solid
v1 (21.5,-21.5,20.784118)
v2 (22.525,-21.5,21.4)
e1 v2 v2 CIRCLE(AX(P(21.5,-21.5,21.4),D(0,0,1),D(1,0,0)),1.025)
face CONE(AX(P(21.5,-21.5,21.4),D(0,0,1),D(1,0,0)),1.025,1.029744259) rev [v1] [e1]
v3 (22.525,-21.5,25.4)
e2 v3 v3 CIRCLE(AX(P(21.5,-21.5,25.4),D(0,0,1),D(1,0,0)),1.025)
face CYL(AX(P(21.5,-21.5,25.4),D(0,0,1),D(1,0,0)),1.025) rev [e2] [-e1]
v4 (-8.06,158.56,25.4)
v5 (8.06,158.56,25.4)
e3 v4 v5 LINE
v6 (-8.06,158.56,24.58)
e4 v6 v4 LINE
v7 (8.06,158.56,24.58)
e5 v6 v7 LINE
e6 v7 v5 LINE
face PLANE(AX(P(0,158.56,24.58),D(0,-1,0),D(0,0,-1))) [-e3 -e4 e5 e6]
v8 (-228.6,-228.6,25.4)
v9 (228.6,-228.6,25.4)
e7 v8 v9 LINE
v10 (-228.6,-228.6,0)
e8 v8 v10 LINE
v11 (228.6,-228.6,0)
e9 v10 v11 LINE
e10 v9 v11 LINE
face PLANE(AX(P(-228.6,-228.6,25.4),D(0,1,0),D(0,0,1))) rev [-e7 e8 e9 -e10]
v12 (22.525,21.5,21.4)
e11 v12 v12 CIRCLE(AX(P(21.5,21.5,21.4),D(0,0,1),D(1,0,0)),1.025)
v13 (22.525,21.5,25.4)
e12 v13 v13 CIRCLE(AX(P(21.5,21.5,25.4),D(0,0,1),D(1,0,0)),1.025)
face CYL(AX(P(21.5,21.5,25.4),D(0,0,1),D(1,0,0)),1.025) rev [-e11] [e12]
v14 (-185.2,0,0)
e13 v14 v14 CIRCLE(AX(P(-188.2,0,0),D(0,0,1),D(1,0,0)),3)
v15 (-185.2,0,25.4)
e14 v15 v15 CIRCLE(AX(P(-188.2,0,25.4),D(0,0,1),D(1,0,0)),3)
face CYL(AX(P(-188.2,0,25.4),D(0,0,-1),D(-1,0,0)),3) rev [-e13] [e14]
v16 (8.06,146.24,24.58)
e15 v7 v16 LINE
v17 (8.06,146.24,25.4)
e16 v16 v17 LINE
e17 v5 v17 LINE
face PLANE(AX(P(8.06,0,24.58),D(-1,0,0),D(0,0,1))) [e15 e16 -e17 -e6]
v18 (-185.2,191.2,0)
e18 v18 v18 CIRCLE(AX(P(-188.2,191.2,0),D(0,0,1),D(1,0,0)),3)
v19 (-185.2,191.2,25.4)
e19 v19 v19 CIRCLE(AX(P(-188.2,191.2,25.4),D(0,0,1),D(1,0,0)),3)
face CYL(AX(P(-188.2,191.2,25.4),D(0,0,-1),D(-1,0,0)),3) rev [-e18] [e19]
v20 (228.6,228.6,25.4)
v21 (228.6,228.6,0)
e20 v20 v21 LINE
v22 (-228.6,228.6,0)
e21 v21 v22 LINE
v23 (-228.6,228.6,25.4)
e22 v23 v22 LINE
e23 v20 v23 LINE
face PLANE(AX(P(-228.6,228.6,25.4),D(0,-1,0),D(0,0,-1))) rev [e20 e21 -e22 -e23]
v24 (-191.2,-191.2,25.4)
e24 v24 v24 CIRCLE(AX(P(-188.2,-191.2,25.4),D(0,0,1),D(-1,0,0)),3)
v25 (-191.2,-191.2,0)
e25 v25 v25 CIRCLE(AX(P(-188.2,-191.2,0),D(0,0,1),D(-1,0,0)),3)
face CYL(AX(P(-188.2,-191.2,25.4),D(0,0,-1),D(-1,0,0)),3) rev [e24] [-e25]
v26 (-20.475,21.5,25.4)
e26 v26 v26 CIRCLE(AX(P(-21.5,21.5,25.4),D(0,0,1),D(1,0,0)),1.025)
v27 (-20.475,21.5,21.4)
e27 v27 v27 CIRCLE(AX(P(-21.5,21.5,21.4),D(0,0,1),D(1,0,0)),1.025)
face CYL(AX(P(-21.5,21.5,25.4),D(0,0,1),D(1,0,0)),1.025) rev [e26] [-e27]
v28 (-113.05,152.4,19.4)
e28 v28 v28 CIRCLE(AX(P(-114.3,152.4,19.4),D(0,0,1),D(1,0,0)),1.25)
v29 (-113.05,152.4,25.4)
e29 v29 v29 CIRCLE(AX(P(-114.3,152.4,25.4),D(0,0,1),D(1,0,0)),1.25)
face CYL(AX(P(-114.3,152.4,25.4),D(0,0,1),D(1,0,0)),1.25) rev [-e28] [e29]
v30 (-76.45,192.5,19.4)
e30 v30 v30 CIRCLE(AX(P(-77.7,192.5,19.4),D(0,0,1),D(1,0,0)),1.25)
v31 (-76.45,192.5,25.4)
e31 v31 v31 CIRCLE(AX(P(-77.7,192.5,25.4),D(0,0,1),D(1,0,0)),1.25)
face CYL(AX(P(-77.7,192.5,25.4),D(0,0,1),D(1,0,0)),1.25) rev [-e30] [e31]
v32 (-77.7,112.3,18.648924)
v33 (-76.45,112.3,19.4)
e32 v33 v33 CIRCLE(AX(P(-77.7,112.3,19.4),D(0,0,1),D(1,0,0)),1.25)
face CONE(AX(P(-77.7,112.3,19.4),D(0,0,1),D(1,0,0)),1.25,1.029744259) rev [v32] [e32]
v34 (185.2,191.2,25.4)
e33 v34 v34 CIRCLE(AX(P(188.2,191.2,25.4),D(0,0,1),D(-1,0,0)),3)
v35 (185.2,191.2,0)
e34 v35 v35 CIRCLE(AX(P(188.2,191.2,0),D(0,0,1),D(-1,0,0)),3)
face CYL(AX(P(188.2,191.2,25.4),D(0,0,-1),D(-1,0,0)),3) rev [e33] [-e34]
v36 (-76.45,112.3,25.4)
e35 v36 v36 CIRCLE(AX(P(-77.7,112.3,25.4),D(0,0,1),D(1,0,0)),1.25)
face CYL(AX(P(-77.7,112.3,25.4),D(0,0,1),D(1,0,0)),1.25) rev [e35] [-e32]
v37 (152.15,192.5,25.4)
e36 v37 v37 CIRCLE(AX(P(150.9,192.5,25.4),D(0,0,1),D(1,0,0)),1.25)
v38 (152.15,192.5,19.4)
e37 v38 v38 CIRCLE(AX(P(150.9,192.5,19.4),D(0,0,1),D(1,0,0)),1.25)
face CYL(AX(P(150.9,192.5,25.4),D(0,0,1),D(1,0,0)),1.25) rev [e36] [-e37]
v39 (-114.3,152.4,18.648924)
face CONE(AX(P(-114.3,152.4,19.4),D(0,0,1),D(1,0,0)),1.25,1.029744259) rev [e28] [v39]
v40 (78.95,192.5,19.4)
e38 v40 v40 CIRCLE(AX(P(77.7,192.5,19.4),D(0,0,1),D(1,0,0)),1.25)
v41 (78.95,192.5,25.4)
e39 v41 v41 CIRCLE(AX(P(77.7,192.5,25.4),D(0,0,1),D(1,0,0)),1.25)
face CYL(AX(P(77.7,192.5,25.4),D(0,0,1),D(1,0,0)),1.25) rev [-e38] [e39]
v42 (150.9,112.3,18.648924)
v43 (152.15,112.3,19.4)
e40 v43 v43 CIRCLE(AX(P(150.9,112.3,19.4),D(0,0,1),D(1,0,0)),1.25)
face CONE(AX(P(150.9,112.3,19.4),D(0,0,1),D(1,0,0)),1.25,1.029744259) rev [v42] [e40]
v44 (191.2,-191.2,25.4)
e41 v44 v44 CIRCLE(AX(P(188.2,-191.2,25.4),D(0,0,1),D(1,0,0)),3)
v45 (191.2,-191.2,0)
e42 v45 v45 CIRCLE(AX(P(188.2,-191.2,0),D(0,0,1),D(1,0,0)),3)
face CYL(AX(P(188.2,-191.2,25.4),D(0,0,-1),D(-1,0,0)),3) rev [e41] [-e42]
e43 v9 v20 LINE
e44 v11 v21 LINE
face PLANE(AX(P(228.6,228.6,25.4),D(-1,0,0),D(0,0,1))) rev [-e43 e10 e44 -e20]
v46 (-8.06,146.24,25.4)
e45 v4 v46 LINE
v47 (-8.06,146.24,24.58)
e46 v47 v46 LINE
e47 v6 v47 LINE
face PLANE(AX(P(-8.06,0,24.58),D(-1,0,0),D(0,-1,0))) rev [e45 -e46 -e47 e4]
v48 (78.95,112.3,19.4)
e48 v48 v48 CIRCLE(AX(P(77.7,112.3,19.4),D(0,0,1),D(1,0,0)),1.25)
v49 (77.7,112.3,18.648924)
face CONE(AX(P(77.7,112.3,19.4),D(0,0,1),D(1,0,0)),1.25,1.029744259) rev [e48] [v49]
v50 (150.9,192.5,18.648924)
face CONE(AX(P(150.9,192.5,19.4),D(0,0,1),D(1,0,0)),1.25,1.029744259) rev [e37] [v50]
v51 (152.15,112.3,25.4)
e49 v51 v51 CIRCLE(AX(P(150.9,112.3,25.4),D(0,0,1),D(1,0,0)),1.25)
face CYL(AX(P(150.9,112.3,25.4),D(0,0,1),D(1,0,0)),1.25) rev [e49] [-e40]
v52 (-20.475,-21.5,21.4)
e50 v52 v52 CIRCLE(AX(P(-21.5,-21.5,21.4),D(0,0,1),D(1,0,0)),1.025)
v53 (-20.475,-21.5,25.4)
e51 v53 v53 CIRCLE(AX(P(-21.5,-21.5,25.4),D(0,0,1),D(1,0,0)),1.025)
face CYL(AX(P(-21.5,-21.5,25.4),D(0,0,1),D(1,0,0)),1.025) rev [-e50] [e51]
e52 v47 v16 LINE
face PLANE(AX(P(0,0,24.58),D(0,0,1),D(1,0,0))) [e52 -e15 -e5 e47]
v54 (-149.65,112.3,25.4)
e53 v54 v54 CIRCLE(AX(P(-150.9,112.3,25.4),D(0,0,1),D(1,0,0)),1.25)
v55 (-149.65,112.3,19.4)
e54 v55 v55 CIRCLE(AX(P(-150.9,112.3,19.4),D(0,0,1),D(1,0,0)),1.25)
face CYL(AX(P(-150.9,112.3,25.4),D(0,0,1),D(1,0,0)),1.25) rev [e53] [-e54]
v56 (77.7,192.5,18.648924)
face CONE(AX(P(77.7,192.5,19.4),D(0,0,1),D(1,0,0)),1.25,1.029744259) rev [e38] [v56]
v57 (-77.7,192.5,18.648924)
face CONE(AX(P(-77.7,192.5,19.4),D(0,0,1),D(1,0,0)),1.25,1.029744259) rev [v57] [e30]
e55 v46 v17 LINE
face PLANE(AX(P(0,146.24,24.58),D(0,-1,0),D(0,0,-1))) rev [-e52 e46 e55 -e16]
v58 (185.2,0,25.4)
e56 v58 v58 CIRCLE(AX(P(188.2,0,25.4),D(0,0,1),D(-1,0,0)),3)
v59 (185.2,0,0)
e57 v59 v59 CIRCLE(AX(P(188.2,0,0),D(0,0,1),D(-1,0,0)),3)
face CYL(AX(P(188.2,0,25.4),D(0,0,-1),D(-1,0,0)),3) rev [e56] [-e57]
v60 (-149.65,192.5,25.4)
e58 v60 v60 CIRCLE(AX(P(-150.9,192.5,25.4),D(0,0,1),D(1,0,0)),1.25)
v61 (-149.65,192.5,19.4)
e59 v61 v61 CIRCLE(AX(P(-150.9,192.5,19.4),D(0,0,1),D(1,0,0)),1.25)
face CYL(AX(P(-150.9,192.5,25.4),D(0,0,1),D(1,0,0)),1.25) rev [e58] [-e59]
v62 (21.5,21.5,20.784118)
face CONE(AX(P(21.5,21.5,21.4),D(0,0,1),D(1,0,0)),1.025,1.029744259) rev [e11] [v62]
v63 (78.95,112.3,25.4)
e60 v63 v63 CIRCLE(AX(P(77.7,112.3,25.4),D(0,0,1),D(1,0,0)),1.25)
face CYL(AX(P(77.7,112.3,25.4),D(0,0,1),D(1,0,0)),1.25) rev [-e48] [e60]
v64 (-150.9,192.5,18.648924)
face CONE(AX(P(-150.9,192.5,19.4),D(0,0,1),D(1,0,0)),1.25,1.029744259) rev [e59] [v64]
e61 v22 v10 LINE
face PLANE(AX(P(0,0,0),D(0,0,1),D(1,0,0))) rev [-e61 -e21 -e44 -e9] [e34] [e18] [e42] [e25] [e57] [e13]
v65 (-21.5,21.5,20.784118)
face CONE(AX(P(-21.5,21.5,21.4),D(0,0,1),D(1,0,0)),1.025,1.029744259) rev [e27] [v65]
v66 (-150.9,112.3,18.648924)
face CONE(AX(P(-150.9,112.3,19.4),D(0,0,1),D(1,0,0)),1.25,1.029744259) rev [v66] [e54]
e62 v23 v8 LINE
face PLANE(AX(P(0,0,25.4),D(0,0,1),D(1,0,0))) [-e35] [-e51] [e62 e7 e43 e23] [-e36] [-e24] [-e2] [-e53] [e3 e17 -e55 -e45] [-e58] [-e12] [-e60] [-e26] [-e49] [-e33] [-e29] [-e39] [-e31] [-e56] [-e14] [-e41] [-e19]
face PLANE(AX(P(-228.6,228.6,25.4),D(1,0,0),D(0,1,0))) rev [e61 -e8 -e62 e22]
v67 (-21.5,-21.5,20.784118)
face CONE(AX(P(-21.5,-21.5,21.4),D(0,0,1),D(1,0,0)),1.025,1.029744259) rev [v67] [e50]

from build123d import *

# Parameters (mm, degrees)
SKETCH1_W             = 457.2
SKETCH1_H             = 457.2
SKETCH1_R             = 3
BOSS_EXTRUDE1_DEPTH   = 25.4
M3_TAPPED_HOLE1_D     = 2.5
M3_TAPPED_HOLE1_DEPTH = 6
M3_TAPPED_HOLE1_TIP   = 0.751075774
CUT_EXTRUDE1_DEPTH    = 0.82


# Read off the part's stored shape, not the designer's step: M2.5 Tapped Hole1
with BuildPart() as part:
    # Sketch1 → Boss-Extrude1 (new body)
    with BuildSketch(Plane.XY):
        Rectangle(SKETCH1_W, SKETCH1_H)
        with Locations((-188.2, 191.2)):
            Circle(SKETCH1_R, mode=Mode.SUBTRACT)
        with Locations((-188.2, 0)):
            Circle(SKETCH1_R, mode=Mode.SUBTRACT)
        with Locations(Location((188.2, 191.2, 0), (0, 0, 180))):
            Circle(SKETCH1_R, mode=Mode.SUBTRACT)
        with Locations(Location((188.2, 0, 0), (0, 0, 180))):
            Circle(SKETCH1_R, mode=Mode.SUBTRACT)
        with Locations((188.2, -191.2)):
            Circle(SKETCH1_R, mode=Mode.SUBTRACT)
        with Locations(Location((-188.2, -191.2, 0), (0, 0, 180))):
            Circle(SKETCH1_R, mode=Mode.SUBTRACT)
    extrude(amount=BOSS_EXTRUDE1_DEPTH)

    # M2.5 Tapped Hole1 outline → M2.5 Tapped Hole1 (revolve, cut)
    with BuildSketch(Plane(origin=(21.5, 21.5, 0), x_dir=(1, 0, 0), z_dir=(0, -1, 0))):
        Polygon((0, 25.4), (0, 20.784117865), (1.025, 21.4), (1.025, 25.4), align=None)
    revolve(axis=Axis((21.5, 21.5, 0), (0, 0, 1)), mode=Mode.SUBTRACT)

    # M2.5 Tapped Hole1 2 outline → M2.5 Tapped Hole1 2 (revolve, cut)
    with BuildSketch(Plane(origin=(-21.5, -21.5, 0), x_dir=(1, 0, 0), z_dir=(0, -1, 0))):
        Polygon((0, 25.4), (0, 20.784117865), (1.025, 21.4), (1.025, 25.4), align=None)
    revolve(axis=Axis((-21.5, -21.5, 0), (0, 0, 1)), mode=Mode.SUBTRACT)

    # M2.5 Tapped Hole1 3 outline → M2.5 Tapped Hole1 3 (revolve, cut)
    with BuildSketch(Plane(origin=(-21.5, 21.5, 0), x_dir=(1, 0, 0), z_dir=(0, -1, 0))):
        Polygon((0, 25.4), (0, 20.784117865), (1.025, 21.4), (1.025, 25.4), align=None)
    revolve(axis=Axis((-21.5, 21.5, 0), (0, 0, 1)), mode=Mode.SUBTRACT)

    # M2.5 Tapped Hole1 4 outline → M2.5 Tapped Hole1 4 (revolve, cut)
    with BuildSketch(Plane(origin=(21.5, -21.5, 0), x_dir=(1, 0, 0), z_dir=(0, -1, 0))):
        Polygon((0, 25.4), (0, 20.784117865), (1.025, 21.4), (1.025, 25.4), align=None)
    revolve(axis=Axis((21.5, -21.5, 0), (0, 0, 1)), mode=Mode.SUBTRACT)

    # M3 Tapped Hole1
    with Locations(Plane.XY.offset(25.4)):
        with Locations((-114.3, 152.4), (-77.7, 112.3), (-150.9, 192.5), (-150.9, 112.3), (-77.7, 192.5), (150.9, 112.3), (77.7, 192.5), (150.9, 192.5), (77.7, 112.3)):
            Hole(M3_TAPPED_HOLE1_D / 2, depth=M3_TAPPED_HOLE1_DEPTH)
            with Locations((0, 0, -(M3_TAPPED_HOLE1_DEPTH + M3_TAPPED_HOLE1_TIP / 2))):  # 118° drill point
                Cone(0, M3_TAPPED_HOLE1_D / 2, M3_TAPPED_HOLE1_TIP, mode=Mode.SUBTRACT)

    # Sketch8 → Cut-Extrude1 (cut)
    with BuildSketch(Plane.XY.offset(25.4)):
        Polygon((0, 152.4), (-8.06, 158.56), (-8.06, 146.24), align=None)
        Polygon((8.06, 158.56), (-8.06, 158.56), (0, 152.4), align=None)
        Polygon((8.06, 146.24), (8.06, 158.56), (0, 152.4), align=None)
        Polygon((0, 152.4), (-8.06, 146.24), (8.06, 146.24), align=None)
    extrude(amount=-CUT_EXTRUDE1_DEPTH, mode=Mode.SUBTRACT)


solid = part.part
